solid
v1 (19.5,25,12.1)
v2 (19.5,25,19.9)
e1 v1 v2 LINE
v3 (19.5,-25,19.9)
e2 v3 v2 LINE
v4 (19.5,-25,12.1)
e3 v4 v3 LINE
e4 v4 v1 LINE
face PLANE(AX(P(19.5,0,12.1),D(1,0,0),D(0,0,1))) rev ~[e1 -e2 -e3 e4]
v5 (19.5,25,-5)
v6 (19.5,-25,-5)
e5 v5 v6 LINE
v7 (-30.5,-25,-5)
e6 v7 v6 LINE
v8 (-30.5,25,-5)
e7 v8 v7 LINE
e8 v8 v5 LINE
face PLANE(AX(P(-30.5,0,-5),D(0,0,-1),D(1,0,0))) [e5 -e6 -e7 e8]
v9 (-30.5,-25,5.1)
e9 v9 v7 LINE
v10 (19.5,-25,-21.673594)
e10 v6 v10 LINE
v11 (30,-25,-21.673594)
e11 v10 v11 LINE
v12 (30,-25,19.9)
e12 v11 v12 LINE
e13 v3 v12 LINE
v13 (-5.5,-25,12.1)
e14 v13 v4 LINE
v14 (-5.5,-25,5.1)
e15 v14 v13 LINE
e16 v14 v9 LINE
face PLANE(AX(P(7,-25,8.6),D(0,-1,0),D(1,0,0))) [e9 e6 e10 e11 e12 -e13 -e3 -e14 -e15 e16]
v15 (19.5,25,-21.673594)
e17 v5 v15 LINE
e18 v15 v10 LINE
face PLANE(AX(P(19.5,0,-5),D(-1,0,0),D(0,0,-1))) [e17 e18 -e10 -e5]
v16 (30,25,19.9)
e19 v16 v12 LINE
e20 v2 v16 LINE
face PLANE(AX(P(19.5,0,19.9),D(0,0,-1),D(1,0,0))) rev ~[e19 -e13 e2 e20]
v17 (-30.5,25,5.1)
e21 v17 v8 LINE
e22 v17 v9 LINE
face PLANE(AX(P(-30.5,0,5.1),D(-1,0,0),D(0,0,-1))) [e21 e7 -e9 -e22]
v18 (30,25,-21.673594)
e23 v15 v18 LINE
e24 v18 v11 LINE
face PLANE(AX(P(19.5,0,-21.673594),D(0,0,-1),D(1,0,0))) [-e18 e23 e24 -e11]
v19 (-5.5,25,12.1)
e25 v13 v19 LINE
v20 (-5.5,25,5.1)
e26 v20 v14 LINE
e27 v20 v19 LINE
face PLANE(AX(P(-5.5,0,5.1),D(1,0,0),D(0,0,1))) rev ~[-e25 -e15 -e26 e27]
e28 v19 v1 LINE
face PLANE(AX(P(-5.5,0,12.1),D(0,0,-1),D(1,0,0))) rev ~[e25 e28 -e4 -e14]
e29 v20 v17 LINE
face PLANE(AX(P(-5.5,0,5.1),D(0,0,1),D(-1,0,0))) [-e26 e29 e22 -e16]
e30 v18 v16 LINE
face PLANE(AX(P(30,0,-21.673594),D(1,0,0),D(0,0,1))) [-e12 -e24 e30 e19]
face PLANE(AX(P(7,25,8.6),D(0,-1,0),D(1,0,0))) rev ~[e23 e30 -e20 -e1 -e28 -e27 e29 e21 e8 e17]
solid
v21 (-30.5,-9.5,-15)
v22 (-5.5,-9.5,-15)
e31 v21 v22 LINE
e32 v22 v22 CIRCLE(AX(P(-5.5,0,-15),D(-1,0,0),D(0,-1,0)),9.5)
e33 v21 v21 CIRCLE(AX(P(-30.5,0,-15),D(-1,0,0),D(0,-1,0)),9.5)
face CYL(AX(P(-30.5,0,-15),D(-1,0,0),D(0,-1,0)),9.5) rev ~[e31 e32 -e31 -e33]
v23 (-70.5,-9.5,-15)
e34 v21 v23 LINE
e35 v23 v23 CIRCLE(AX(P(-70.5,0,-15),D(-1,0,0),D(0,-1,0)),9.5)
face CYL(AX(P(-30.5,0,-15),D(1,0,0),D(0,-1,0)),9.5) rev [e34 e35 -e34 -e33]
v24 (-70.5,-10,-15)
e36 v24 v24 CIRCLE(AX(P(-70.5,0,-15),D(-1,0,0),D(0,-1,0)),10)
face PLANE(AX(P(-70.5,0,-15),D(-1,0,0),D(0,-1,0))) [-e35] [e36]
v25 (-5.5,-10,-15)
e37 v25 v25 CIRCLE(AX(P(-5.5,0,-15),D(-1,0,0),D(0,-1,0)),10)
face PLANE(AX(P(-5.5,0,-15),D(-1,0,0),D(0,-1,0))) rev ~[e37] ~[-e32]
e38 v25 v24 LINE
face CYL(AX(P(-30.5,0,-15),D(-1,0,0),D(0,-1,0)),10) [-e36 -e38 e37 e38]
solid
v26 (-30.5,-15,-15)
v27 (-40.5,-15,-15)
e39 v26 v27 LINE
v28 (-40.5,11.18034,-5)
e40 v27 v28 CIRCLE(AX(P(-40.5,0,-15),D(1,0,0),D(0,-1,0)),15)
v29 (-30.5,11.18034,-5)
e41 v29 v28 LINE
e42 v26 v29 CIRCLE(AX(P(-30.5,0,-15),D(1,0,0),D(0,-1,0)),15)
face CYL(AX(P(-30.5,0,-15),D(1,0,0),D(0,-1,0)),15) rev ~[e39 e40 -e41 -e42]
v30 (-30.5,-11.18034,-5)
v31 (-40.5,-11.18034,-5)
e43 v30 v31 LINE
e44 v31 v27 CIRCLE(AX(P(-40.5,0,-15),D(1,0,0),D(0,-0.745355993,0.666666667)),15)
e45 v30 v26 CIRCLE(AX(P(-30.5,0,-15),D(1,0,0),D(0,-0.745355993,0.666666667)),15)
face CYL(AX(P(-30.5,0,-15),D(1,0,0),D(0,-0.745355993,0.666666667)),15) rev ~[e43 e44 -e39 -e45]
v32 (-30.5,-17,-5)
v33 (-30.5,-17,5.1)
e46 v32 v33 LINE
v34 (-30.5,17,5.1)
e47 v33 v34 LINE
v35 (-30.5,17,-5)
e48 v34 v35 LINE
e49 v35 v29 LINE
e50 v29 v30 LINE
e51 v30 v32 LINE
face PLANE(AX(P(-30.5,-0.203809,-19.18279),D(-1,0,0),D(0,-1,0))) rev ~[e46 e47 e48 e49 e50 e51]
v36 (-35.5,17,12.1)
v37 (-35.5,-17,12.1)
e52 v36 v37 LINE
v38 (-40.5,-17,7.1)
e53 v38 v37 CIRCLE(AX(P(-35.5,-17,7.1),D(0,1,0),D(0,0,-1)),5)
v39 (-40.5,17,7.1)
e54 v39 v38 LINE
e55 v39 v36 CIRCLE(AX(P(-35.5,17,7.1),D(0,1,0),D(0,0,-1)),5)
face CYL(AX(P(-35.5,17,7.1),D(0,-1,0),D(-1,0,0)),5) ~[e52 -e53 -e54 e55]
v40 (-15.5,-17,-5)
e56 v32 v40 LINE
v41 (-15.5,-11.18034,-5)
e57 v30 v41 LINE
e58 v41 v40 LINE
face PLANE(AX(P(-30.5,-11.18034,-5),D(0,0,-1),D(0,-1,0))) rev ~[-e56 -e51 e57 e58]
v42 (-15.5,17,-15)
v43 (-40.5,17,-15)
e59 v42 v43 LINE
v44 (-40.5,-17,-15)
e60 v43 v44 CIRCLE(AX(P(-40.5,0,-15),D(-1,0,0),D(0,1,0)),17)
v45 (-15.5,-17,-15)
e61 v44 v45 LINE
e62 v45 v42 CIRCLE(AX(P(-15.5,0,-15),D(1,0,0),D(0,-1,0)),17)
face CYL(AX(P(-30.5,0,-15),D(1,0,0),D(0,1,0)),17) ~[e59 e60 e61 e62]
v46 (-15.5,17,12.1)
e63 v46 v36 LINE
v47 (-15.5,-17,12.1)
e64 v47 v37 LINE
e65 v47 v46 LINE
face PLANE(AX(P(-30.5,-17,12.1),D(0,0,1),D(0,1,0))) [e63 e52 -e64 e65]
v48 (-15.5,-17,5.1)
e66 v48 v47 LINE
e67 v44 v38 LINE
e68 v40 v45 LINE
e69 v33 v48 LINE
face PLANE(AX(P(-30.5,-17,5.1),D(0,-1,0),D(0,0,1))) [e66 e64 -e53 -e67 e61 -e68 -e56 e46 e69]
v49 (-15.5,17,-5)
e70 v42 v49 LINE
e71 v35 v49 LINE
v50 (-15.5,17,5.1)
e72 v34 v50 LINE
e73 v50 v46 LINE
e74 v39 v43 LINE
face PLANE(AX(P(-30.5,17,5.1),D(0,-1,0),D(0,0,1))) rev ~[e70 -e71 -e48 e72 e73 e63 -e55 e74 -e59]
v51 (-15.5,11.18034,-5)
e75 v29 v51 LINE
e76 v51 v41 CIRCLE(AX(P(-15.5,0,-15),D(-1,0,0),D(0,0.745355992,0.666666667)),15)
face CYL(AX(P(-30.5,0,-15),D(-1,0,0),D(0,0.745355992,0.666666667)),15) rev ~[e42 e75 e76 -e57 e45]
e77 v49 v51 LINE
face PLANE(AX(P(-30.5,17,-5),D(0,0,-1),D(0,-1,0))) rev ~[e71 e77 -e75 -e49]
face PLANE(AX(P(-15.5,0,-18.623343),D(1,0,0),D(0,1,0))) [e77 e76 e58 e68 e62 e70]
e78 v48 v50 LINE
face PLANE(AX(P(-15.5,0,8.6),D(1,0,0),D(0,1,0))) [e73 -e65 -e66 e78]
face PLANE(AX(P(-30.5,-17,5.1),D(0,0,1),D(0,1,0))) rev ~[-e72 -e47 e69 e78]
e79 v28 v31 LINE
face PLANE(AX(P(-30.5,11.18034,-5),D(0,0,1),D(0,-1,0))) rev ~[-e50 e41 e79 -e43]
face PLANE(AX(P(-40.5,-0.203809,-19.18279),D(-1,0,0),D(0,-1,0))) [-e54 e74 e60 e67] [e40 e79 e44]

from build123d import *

# Parameters (mm, degrees)
F0_W          = 25
F0_H          = 7
F0_W_2        = 10.5
F0_H_2        = 16.6735936701
F0_H_3        = 10.1
F0_H_4        = 7.8
F1_DEPTH      = 25
F1_DEPTH_BACK = 25
F2_R          = 10
F2_R_2        = 9.5
F3_DEPTH      = 40
F3_DEPTH_BACK = 25
F4_W          = 34
F4_H          = 7
F5_DEPTH      = 10
F6_W          = 34
F6_H          = 7
F7_DEPTH      = 15
F8_R          = 5


with BuildPart() as f1:
    # F0 (on Front) → F1 (new body, two sides)
    with BuildSketch(Plane.XZ) as f1_sk:
        with Locations((7, 8.6)):
            Rectangle(F0_W, F0_H)
        with Locations((24.75, -13.3367968351)):
            Rectangle(F0_W_2, F0_H_2)
        with Locations((24.75, 0.05)):
            Rectangle(F0_W_2, F0_H_3)
        with Locations((24.75, 16)):
            Rectangle(F0_W_2, F0_H_4)
        with Locations((24.75, 8.6)):
            Rectangle(F0_W_2, F0_H)
        Polygon((-5.5, 5.1), (-30.5, 5.1), (-30.5, -5), (19.5, -5), (19.5, 5.1), align=None)
    extrude(amount=F1_DEPTH)
    extrude(f1_sk.sketch, amount=-F1_DEPTH_BACK)


with BuildPart() as f3:
    # F2 (on face) → F3 (new body, two sides)
    with BuildSketch(Plane(origin=(-30.5, 0, 0), x_dir=(0, -1, 0), z_dir=(-1, 0, 0))) as f3_sk:
        with Locations((0, -15)):
            Circle(F2_R)
        with Locations((0, -15)):
            Circle(F2_R_2, mode=Mode.SUBTRACT)
    extrude(amount=F3_DEPTH)
    extrude(f3_sk.sketch, amount=-F3_DEPTH_BACK)


with BuildPart() as f5:
    # F4 (on face) → F5 (new body)
    with BuildSketch(Plane(origin=(-30.5, 0, 0), x_dir=(0, -1, 0), z_dir=(-1, 0, 0))):
        with BuildLine():
            ThreePointArc((11.1803398875, -5), (14.0125853844, -9.6476686534), (15, -15))
            ThreePointArc((15, -15), (-5.3523313466, -29.0125853844), (-11.1803398875, -5))
            Line((-11.1803398875, -5), (-13.7477270849, -5))
            ThreePointArc((-13.7477270849, -5), (-16.1664987001, -9.7422134145), (-17, -15))
            ThreePointArc((-17, -15), (0, -32), (17, -15))
            ThreePointArc((17, -15), (16.1664987001, -9.7422134145), (13.7477270849, -5))
            Line((13.7477270849, -5), (11.1803398875, -5))
        make_face()
        with BuildLine():
            ThreePointArc((-17, -15), (-16.1664987001, -9.7422134145), (-13.7477270849, -5))
            Line((-13.7477270849, -5), (-17, -5))
            Line((-17, -5), (-17, -15))
        make_face()
        with BuildLine():
            Line((17, -5), (13.7477270849, -5))
            ThreePointArc((13.7477270849, -5), (16.1664987001, -9.7422134145), (17, -15))
            Line((17, -15), (17, -5))
        make_face()
        with BuildLine():
            ThreePointArc((-13.7477270849, -5), (0, 2), (13.7477270849, -5))
            Line((13.7477270849, -5), (17, -5))
            Line((17, -5), (17, 5.1))
            Line((17, 5.1), (-17, 5.1))
            Line((-17, 5.1), (-17, -5))
            Line((-17, -5), (-13.7477270849, -5))
        make_face()
        with BuildLine():
            ThreePointArc((-11.1803398875, -5), (0, 0), (11.1803398875, -5))
            Line((11.1803398875, -5), (13.7477270849, -5))
            ThreePointArc((13.7477270849, -5), (0, 2), (-13.7477270849, -5))
            Line((-13.7477270849, -5), (-11.1803398875, -5))
        make_face()
        with BuildLine():
            Line((-11.1803398875, -5), (11.1803398875, -5))
            ThreePointArc((11.1803398875, -5), (0, 0), (-11.1803398875, -5))
        make_face()
        with Locations((0, 8.6)):
            Rectangle(F4_W, F4_H)
    extrude(amount=F5_DEPTH)

    # F6 (on face) → F7 (join)
    with BuildSketch(Plane.YZ.offset(-30.5)):
        with Locations((0, 8.6)):
            Rectangle(F6_W, F6_H)
        with BuildLine():
            Line((17, -15), (17, -5))
            Line((17, -5), (11.1803398875, -5))
            ThreePointArc((11.1803398875, -5), (0, -30), (-11.1803398875, -5))
            Line((-11.1803398875, -5), (-17, -5))
            Line((-17, -5), (-17, -15))
            ThreePointArc((-17, -15), (0, -32), (17, -15))
        make_face()
    extrude(amount=F7_DEPTH)

    # F8
    f8_edges = [f5.edges().sort_by_distance(p)[0] for p in [
        (-40.5, 0, 12.1),
    ]]
    fillet(f8_edges, radius=F8_R)


solid = Compound([f1.part, f3.part, f5.part])
